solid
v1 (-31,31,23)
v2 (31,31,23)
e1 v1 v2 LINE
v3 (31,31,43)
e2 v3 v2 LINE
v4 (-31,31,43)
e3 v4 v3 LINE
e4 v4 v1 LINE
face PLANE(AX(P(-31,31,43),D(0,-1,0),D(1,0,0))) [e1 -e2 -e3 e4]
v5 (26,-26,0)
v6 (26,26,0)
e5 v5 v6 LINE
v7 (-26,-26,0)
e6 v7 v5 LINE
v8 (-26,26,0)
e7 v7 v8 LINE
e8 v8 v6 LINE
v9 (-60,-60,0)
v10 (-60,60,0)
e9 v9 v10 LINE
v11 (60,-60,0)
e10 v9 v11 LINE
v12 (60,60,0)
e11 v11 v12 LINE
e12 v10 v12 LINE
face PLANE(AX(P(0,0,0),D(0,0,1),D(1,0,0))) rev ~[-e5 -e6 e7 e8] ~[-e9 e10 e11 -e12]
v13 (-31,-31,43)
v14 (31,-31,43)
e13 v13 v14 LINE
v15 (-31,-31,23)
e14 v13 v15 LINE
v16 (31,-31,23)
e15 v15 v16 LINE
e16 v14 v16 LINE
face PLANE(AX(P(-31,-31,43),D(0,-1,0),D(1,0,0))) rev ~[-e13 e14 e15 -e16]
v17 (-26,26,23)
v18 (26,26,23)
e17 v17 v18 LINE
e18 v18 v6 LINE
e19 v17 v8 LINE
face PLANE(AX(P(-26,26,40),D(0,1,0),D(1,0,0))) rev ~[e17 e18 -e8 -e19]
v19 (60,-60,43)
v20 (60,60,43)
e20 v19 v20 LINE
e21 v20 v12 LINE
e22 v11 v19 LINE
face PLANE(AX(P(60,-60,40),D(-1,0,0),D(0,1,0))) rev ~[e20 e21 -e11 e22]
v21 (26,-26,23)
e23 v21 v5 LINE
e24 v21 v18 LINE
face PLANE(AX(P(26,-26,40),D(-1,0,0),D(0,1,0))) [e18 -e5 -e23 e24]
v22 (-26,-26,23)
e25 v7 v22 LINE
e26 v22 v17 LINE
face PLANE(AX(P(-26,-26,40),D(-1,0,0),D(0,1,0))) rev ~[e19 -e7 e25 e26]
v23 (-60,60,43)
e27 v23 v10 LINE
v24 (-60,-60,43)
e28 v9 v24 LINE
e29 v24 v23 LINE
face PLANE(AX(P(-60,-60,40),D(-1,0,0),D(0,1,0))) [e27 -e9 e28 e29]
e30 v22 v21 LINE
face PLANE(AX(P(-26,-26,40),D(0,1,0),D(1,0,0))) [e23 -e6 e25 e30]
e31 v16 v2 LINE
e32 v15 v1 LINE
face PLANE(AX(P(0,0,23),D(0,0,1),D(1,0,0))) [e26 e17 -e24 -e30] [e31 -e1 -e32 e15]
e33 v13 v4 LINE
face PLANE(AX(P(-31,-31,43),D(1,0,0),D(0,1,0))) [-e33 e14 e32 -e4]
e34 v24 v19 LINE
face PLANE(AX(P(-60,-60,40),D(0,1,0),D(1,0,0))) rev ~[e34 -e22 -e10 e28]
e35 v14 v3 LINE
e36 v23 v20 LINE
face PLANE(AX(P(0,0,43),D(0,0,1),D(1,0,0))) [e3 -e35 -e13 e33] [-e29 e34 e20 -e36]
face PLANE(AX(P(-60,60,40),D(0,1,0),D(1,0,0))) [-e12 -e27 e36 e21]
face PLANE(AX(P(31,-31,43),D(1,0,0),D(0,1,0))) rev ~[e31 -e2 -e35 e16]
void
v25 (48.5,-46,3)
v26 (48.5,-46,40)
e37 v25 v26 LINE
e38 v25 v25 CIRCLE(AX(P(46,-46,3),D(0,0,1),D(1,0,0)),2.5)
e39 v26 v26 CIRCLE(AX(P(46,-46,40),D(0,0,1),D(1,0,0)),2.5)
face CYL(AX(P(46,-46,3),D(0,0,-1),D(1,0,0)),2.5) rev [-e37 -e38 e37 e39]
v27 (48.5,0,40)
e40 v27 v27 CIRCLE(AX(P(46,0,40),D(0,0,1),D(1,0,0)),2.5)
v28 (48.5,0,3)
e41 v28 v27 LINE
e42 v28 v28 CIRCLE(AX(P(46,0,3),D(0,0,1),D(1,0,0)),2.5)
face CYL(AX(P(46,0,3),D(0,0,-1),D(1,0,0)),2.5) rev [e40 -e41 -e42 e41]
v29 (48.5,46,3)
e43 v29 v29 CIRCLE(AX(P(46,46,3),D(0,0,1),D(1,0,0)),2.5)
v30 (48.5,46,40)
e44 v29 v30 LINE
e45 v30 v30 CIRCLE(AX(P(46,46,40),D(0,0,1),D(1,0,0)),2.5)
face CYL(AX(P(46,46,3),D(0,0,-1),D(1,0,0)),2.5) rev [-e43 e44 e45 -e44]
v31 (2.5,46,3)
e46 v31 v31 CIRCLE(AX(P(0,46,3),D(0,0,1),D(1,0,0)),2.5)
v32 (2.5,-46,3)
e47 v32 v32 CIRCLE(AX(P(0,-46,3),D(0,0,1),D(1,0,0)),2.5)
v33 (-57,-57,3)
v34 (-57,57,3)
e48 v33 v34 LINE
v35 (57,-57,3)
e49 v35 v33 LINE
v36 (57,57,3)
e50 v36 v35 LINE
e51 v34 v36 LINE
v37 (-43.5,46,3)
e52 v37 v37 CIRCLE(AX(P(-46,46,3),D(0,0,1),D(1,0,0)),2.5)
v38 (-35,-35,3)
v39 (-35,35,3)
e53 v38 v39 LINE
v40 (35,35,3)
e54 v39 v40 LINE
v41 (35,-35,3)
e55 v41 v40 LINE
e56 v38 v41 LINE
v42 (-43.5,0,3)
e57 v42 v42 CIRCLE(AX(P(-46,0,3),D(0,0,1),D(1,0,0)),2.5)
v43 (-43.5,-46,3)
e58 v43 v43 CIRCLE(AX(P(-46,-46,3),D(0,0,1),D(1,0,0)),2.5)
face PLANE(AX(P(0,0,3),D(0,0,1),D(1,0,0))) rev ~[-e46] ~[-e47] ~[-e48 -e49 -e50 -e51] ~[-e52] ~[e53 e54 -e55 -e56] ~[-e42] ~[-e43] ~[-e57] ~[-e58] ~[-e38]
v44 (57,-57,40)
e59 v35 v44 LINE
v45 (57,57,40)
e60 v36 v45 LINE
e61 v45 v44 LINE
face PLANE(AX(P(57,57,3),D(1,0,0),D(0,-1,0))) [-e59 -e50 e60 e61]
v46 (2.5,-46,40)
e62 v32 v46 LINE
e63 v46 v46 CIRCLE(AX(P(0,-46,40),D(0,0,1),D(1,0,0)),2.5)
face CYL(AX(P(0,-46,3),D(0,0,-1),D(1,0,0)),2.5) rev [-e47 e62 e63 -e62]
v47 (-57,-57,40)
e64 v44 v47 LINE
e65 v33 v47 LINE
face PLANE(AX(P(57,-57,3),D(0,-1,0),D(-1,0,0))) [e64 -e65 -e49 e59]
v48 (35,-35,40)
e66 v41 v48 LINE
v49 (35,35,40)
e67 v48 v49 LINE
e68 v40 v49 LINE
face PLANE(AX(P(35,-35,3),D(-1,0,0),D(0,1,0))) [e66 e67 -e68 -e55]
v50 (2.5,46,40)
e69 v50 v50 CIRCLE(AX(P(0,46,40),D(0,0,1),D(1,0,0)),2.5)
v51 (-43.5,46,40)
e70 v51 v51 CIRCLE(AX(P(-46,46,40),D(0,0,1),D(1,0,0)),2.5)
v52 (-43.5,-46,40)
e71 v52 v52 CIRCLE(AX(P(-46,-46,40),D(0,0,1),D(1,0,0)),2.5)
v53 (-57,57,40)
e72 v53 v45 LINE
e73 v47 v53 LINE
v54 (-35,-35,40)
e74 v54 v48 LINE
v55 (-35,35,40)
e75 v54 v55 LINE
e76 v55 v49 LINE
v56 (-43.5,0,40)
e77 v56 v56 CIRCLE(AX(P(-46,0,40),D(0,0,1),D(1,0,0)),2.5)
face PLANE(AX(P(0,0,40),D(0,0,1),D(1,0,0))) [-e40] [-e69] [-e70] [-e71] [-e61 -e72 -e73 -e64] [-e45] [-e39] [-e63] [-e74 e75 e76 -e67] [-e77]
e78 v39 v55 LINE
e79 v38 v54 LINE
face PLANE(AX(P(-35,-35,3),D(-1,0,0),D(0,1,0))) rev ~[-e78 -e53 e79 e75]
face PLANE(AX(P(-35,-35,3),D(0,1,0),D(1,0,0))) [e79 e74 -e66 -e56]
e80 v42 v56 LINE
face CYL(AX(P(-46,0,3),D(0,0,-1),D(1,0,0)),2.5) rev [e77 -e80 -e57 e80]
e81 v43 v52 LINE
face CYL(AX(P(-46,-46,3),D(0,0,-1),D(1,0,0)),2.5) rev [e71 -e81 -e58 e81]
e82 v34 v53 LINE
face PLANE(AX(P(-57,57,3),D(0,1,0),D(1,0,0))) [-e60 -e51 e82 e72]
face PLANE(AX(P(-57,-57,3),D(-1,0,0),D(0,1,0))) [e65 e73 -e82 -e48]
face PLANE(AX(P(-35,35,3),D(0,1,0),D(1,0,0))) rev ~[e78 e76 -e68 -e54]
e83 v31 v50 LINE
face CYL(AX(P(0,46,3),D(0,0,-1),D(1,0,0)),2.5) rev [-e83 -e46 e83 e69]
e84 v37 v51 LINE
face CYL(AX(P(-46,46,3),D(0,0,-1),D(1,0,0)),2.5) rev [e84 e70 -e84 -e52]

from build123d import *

# Parameters (mm, degrees)
F0_W     = 120
F0_H     = 120
F1_DEPTH = 3
F2_W     = 52
F2_H     = 52
F3_DEPTH = 25
F2_W_2   = 120
F2_H_2   = 120
F2_W_3   = 70
F2_H_3   = 70
F2_R     = 2.5
F4_DEPTH = 37
F5_W     = 120
F5_H     = 120
F5_W_2   = 114
F5_H_2   = 114
F5_W_3   = 52
F5_H_3   = 52
F6_DEPTH = 3
F7_W     = 62
F7_H     = 62
F7_W_2   = 52
F7_H_2   = 52
F8_DEPTH = 20


with BuildPart() as f1:
    # F0 (on Top) → F1 (new body)
    with BuildSketch(Plane.XY):
        Rectangle(F0_W, F0_H)
    extrude(amount=F1_DEPTH)

    # F2 (on face) → F3 (cut)
    with BuildSketch(Plane.XY.offset(3)):
        Rectangle(F2_W, F2_H)
    extrude(amount=-F3_DEPTH, mode=Mode.SUBTRACT)

    # F2 (on face) → F4 (join)
    with BuildSketch(Plane.XY.offset(3)):
        Rectangle(F2_W_2, F2_H_2)
        Polygon((-57, -57), (-57, -35), (-57, 35), (-57, 57), (-35, 57), (35, 57), (57, 57), (57, 35), (57, -35), (57, -57), (35, -57), (-35, -57), align=None, mode=Mode.SUBTRACT)
        Rectangle(F2_W_3, F2_H_3)
        Rectangle(F2_W, F2_H, mode=Mode.SUBTRACT)
        with Locations((46, 46)):
            Circle(F2_R)
        with Locations((0, 46)):
            Circle(F2_R)
        with Locations((-46, 46)):
            Circle(F2_R)
        with Locations((-46, 0)):
            Circle(F2_R)
        with Locations((-46, -46)):
            Circle(F2_R)
        with Locations((0, -46)):
            Circle(F2_R)
        with Locations((46, -46)):
            Circle(F2_R)
        with Locations((46, 0)):
            Circle(F2_R)
    extrude(amount=F4_DEPTH)

    # F5 (on face) → F6 (join)
    with BuildSketch(Plane.XY.offset(40)):
        Rectangle(F5_W, F5_H)
        Rectangle(F5_W_2, F5_H_2, mode=Mode.SUBTRACT)
        Rectangle(F5_W_2, F5_H_2)
        Rectangle(F5_W_3, F5_H_3, mode=Mode.SUBTRACT)
    extrude(amount=F6_DEPTH)

    # F7 (on face) → F8 (cut)
    with BuildSketch(Plane.XY.offset(43)):
        Rectangle(F7_W, F7_H)
        Rectangle(F7_W_2, F7_H_2, mode=Mode.SUBTRACT)
    extrude(amount=-F8_DEPTH, mode=Mode.SUBTRACT)


solid = f1.part
